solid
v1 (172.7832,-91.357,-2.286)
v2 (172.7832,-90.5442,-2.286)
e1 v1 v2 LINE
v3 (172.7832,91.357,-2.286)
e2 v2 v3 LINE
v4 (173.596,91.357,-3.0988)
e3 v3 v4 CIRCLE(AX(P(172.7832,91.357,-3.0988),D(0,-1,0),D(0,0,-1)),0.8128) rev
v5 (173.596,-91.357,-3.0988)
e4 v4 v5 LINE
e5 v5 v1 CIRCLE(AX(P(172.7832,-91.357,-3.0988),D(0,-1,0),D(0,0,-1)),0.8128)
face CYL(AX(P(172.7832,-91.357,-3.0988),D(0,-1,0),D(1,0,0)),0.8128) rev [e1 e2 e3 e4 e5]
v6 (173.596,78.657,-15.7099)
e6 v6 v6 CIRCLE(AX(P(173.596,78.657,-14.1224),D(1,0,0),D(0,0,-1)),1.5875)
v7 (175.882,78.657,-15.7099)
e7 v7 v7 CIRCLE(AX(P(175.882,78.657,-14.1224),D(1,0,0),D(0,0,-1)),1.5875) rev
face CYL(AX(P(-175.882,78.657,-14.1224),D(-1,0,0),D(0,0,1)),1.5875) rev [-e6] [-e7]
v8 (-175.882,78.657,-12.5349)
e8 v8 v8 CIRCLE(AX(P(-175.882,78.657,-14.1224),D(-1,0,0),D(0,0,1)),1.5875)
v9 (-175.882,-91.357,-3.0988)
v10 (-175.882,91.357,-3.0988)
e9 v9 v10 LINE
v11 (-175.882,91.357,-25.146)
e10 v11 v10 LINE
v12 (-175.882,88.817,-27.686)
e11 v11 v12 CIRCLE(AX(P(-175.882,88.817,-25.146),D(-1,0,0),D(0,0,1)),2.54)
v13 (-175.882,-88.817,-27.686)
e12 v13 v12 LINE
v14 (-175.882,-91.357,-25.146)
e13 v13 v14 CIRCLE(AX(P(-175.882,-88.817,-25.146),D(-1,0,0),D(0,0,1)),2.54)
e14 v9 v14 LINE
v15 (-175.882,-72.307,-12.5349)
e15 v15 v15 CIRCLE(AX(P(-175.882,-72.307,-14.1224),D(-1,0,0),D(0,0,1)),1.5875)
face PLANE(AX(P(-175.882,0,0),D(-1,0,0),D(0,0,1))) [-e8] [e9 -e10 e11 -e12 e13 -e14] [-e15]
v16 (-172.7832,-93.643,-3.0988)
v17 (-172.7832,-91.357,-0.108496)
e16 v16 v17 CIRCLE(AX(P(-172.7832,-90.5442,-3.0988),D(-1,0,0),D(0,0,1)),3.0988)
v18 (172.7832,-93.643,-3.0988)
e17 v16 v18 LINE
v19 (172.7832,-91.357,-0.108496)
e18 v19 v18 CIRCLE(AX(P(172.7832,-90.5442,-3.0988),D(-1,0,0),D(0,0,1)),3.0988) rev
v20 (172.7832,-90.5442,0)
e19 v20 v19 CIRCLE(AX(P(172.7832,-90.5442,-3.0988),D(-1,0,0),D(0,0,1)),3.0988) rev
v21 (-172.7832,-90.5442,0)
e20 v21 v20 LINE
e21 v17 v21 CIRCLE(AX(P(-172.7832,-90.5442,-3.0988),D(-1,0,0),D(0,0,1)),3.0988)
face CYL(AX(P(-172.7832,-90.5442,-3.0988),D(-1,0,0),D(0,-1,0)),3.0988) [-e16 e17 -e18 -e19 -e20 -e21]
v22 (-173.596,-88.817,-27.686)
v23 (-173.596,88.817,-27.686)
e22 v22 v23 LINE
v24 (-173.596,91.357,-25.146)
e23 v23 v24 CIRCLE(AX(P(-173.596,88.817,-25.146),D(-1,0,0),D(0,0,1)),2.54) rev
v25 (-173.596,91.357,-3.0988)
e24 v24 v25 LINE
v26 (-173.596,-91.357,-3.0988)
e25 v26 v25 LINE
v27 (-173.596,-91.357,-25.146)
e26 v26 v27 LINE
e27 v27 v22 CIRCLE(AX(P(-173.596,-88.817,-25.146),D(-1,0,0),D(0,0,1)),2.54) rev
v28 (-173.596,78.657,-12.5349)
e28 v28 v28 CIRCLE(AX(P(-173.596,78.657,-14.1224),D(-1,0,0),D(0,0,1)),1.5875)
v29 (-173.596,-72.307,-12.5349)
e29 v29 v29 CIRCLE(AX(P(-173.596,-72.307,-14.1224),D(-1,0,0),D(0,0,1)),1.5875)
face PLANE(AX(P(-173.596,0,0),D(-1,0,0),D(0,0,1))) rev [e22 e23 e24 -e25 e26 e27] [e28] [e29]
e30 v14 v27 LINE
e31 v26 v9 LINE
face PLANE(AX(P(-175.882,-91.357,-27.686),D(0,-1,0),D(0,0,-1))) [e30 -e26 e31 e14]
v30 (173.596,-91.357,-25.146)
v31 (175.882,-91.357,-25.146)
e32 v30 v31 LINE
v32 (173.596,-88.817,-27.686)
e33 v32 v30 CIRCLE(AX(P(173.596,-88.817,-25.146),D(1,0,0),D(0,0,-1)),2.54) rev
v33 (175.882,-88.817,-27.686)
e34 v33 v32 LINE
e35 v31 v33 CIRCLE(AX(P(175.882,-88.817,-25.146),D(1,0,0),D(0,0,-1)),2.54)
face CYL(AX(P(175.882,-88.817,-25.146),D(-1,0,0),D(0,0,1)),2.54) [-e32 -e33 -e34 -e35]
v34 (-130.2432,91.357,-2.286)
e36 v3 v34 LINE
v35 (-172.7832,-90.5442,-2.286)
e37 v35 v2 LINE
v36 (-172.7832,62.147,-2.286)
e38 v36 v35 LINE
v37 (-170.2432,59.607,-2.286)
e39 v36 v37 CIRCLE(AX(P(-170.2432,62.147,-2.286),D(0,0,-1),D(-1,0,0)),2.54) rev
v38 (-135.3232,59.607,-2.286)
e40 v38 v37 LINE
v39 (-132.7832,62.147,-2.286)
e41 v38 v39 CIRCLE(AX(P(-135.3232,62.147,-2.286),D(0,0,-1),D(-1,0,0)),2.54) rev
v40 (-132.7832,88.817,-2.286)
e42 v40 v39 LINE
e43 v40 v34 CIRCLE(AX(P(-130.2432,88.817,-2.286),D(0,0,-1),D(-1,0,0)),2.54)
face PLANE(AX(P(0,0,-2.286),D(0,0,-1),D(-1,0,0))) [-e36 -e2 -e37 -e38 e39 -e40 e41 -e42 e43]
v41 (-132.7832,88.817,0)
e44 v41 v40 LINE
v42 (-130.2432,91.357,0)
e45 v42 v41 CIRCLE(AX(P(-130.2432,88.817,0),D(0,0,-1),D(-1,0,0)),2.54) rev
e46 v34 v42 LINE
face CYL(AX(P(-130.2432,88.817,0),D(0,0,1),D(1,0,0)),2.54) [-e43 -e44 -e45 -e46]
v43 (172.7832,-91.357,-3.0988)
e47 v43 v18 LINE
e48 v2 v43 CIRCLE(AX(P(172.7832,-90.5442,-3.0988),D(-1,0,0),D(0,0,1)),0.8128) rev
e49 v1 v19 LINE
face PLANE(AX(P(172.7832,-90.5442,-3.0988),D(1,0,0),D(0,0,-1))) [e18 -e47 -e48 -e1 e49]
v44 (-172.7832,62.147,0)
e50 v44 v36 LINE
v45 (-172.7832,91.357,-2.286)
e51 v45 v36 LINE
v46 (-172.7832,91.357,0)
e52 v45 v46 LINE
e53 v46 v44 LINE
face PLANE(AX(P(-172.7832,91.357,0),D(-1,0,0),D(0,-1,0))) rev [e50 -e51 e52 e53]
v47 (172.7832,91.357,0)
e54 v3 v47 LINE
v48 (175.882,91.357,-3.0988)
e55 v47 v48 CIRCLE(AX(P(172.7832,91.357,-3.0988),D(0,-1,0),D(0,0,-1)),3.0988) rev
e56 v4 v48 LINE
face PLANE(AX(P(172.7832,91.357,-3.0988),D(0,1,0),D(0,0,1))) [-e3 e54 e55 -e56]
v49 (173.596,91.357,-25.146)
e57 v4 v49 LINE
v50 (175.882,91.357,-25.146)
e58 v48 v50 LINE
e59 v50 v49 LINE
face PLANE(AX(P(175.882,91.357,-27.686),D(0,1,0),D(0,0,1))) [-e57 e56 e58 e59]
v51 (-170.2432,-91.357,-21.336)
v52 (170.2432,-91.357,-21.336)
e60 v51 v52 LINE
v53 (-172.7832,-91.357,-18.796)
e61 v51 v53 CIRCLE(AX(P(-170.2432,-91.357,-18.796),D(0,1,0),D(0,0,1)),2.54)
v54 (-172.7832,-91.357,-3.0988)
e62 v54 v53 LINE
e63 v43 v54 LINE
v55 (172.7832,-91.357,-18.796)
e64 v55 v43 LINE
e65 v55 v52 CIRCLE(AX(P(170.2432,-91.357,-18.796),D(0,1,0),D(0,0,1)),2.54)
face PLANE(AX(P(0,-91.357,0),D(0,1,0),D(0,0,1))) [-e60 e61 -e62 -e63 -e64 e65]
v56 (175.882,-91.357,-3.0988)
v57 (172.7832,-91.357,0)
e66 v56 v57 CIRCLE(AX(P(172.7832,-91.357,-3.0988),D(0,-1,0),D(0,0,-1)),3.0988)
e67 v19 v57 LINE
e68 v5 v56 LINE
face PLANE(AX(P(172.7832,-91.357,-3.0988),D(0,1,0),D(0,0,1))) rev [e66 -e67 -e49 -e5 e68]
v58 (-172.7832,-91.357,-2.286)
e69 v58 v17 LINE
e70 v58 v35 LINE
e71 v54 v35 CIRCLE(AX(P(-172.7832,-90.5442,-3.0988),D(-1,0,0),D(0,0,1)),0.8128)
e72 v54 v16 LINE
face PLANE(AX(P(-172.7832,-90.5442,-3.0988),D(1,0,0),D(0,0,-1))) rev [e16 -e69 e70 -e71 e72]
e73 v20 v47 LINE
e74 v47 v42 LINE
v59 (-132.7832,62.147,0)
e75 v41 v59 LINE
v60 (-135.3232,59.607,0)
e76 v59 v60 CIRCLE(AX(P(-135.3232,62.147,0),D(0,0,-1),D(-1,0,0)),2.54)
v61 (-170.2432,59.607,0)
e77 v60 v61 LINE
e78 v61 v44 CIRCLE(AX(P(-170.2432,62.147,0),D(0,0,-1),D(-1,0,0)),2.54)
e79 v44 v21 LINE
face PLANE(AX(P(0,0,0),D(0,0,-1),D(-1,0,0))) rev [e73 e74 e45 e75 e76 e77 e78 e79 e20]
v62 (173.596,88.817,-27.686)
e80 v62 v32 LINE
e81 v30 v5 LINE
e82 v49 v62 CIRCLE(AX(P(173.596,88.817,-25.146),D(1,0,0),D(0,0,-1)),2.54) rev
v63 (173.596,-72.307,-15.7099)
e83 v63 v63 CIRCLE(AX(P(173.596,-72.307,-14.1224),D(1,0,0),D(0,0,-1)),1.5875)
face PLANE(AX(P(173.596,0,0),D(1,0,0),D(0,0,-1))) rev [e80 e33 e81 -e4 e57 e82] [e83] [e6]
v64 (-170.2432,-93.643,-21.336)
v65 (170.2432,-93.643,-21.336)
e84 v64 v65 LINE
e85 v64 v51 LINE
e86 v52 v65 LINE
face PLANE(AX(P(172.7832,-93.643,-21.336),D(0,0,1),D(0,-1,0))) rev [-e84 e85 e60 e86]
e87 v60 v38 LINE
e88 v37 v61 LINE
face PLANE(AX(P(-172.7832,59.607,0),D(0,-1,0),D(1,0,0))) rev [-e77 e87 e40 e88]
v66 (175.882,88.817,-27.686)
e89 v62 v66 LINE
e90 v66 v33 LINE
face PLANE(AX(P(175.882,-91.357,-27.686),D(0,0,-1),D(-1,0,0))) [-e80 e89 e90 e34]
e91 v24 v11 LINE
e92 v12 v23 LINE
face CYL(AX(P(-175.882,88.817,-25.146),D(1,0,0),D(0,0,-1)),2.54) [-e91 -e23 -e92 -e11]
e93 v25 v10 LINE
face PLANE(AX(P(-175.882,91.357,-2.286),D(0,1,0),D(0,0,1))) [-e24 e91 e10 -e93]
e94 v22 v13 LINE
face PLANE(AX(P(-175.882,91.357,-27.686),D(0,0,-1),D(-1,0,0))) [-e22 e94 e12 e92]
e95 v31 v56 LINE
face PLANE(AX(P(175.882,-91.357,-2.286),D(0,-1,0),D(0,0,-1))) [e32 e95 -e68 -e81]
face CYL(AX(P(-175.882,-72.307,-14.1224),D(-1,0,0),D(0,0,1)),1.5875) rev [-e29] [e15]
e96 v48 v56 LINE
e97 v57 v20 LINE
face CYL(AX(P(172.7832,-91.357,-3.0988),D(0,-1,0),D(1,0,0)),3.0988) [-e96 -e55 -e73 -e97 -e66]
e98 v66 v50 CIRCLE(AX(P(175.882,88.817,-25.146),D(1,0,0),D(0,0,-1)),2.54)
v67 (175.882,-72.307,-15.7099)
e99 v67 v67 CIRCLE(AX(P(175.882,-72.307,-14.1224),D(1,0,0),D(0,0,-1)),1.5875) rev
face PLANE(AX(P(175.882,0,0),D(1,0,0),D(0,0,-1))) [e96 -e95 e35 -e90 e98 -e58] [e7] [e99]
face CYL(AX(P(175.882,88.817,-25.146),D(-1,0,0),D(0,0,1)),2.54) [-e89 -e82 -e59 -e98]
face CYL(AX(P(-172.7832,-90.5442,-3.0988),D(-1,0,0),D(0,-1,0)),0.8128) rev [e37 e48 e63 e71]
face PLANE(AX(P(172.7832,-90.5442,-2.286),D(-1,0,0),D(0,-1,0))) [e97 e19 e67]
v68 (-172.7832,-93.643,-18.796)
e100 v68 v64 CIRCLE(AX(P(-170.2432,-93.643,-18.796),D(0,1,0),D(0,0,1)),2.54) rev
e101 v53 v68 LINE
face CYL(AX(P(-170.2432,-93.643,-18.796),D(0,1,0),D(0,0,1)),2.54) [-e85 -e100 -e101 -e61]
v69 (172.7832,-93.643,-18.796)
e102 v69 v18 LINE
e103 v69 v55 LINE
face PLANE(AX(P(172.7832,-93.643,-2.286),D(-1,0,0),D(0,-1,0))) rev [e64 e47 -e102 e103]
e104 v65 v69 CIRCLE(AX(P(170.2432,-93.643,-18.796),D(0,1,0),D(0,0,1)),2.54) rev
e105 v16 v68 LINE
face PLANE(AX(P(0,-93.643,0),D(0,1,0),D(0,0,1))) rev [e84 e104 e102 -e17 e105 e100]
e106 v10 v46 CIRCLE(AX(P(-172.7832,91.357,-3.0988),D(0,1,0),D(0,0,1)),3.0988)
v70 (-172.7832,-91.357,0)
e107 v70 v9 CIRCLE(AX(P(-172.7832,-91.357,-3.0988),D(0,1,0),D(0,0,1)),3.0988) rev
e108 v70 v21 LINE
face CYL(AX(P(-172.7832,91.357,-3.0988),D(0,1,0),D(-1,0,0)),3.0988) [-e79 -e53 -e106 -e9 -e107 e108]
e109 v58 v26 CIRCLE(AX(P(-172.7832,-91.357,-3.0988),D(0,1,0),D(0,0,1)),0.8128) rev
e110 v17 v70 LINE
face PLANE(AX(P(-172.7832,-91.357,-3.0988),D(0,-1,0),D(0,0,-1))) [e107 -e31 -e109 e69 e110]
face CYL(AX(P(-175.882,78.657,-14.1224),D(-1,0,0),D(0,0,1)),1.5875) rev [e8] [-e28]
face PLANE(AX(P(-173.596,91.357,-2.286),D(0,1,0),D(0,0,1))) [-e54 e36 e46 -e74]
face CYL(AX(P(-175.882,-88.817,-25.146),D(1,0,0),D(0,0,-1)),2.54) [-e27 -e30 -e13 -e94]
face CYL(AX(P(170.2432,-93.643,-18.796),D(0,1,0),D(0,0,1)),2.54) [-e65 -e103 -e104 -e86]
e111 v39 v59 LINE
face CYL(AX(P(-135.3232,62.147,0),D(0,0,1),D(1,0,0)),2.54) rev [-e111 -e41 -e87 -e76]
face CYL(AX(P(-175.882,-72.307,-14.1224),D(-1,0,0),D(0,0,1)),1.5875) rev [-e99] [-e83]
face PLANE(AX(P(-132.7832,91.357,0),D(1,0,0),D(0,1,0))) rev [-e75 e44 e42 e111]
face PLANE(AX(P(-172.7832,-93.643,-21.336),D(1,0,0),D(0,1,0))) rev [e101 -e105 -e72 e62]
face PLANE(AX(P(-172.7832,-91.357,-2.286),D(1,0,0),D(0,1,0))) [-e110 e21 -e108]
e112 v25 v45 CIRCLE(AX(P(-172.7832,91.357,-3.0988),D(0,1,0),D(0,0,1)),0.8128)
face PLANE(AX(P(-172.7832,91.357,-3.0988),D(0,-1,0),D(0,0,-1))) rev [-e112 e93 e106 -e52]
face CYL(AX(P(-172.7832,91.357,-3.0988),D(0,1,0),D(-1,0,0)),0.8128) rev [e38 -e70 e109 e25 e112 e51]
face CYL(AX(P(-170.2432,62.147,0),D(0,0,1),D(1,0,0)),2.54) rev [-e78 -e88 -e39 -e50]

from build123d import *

# Parameters (mm, degrees)
SKETCH1_W                      = 347.1920001
SKETCH1_H                      = 182.714000078
BASE_FLANGE1_DEPTH             = 2.286
EDGE_FLANGE1_STRIP_W           = 10.7696
EDGE_FLANGE1_STRIP_H           = 2.286
EDGE_FLANGE1_STRIP_CUT_DEPTH   = 182.714000078
EDGE_FLANGE1_STRIP_2_W         = 10.7696
EDGE_FLANGE1_STRIP_2_H         = 2.286
EDGE_FLANGE1_STRIP_CUT_2_DEPTH = 182.714000078
EDGE_FLANGE1_DEPTH             = 182.714000078
EDGE_FLANGE1_BEND_DEPTH        = 182.714000078
EDGE_FLANGE2_STRIP_W           = 10.7696
EDGE_FLANGE2_STRIP_H           = 2.286
EDGE_FLANGE2_STRIP_CUT_DEPTH   = 345.5664001
EDGE_FLANGE2_DEPTH             = 345.5664001
SKETCH17_W                     = 40
SKETCH17_H                     = 31.75
CUT_EXTRUDE1_DEPTH             = 201.869732409
FILLET1_R                      = 2.54
F_1_8_0_1250_DOWEL_HOLE1_D     = 3.175
F_1_8_0_1250_DOWEL_HOLE1_DEPTH = 351.7640001
F_1_8_0_1250_DOWEL_HOLE1_TIP   = 0.953866233


# Sheet-metal steps are written as plain solids
with BuildPart() as part:
    # Sketch1 → Base-Flange1 (new body)
    with BuildSketch(Plane.XY):
        Rectangle(SKETCH1_W, SKETCH1_H)
    extrude(amount=-BASE_FLANGE1_DEPTH)

    # Edge-Flange1 strip (across the edge) → Edge-Flange1 strip cut (cut)
    with BuildSketch(Plane(origin=(173.59600005, 91.357000039, -2.286), x_dir=(-1, 0, 0), z_dir=(0, -1, 0))):
        with Locations((-4.572, -1.143)):
            Rectangle(EDGE_FLANGE1_STRIP_W, EDGE_FLANGE1_STRIP_H)
    extrude(amount=EDGE_FLANGE1_STRIP_CUT_DEPTH, mode=Mode.SUBTRACT)

    # Edge-Flange1 strip 2 (across the edge) → Edge-Flange1 strip cut 2 (cut)
    with BuildSketch(Plane(origin=(-173.59600005, -91.357000039, -2.286), x_dir=(1, 0, 0), z_dir=(0, 1, 0))):
        with Locations((-4.572, -1.143)):
            Rectangle(EDGE_FLANGE1_STRIP_2_W, EDGE_FLANGE1_STRIP_2_H)
    extrude(amount=EDGE_FLANGE1_STRIP_CUT_2_DEPTH, mode=Mode.SUBTRACT)

    # Edge-Flange1 section (across the edge) → Edge-Flange1 (add)
    with BuildSketch(Plane(origin=(173.59600005, 91.357000039, -2.286), x_dir=(-1, 0, 0), z_dir=(0, -1, 0))):
        with BuildLine():
            Line((-2.286, 0.8128), (-2.286, 25.4))
            Line((-2.286, 25.4), (0, 25.4))
            Line((0, 25.4), (0, 0.8128))
            ThreePointArc((0, 0.8128), (0.238063608, 0.238063608), (0.8128, 0))
            Line((0.8128, 0), (0.8128, -2.286))
            ThreePointArc((0.8128, -2.286), (-1.378382494, -1.378382494), (-2.286, 0.8128))
        make_face()
    extrude(amount=EDGE_FLANGE1_DEPTH)

    # Edge-Flange1 section 2 (across the edge) → Edge-Flange1 bend (add)
    with BuildSketch(Plane(origin=(-173.59600005, -91.357000039, -2.286), x_dir=(1, 0, 0), z_dir=(0, 1, 0))):
        with BuildLine():
            Line((-2.286, 0.8128), (-2.286, 25.4))
            Line((-2.286, 25.4), (0, 25.4))
            Line((0, 25.4), (0, 0.8128))
            ThreePointArc((0, 0.8128), (0.238063608, 0.238063608), (0.8128, 0))
            Line((0.8128, 0), (0.8128, -2.286))
            ThreePointArc((0.8128, -2.286), (-1.378382494, -1.378382494), (-2.286, 0.8128))
        make_face()
    extrude(amount=EDGE_FLANGE1_BEND_DEPTH)

    # Edge-Flange2 strip (across the edge) → Edge-Flange2 strip cut (cut)
    with BuildSketch(Plane(origin=(172.78320005, -91.357000039, -2.286), x_dir=(0, 1, 0), z_dir=(-1, 0, 0))):
        with Locations((-4.572, -1.143)):
            Rectangle(EDGE_FLANGE2_STRIP_W, EDGE_FLANGE2_STRIP_H)
    extrude(amount=EDGE_FLANGE2_STRIP_CUT_DEPTH, mode=Mode.SUBTRACT)

    # Edge-Flange2 section (across the edge) → Edge-Flange2 (add)
    with BuildSketch(Plane(origin=(172.78320005, -91.357000039, -2.286), x_dir=(0, 1, 0), z_dir=(-1, 0, 0))):
        with BuildLine():
            Line((-2.286, 0.8128), (-2.286, 19.05))
            Line((-2.286, 19.05), (0, 19.05))
            Line((0, 19.05), (0, 0.8128))
            ThreePointArc((0, 0.8128), (0.238063608, 0.238063608), (0.8128, 0))
            Line((0.8128, 0), (0.8128, -2.286))
            ThreePointArc((0.8128, -2.286), (-1.378382494, -1.378382494), (-2.286, 0.8128))
        make_face()
    extrude(amount=EDGE_FLANGE2_DEPTH)

    # Sketch17 → Cut-Extrude1 (cut, through all)
    with BuildSketch(Plane(origin=(0, 0, -2.286), x_dir=(-1, 0, 0), z_dir=(0, 0, -1))):
        with Locations((152.78320005, 75.482000039)):
            Rectangle(SKETCH17_W, SKETCH17_H)
    extrude(amount=-CUT_EXTRUDE1_DEPTH, mode=Mode.SUBTRACT)

    # Fillet1
    fillet1_edges = [part.edges().sort_by_distance(p)[0] for p in [
        (172.78320005, -92.500000039, -21.336),
        (-172.78320005, -92.500000039, -21.336),
        (-172.78320005, 59.607000039, -1.143),
        (-132.78320005, 59.607000039, -1.143),
        (-132.78320005, 91.357000039, -1.143),
        (174.73900005, 91.357000039, -27.686),
        (174.73900005, -91.357000039, -27.686),
        (-174.73900005, -91.357000039, -27.686),
        (-174.73900005, 91.357000039, -27.686),
    ]]
    fillet(fillet1_edges, radius=FILLET1_R)

    # 1/8 (0.1250) Dowel Hole1
    with Locations(Plane.ZY.offset(175.88200005)):
        with Locations((-14.1224, -72.307000039), (-14.1224, 78.657000039)):
            Hole(F_1_8_0_1250_DOWEL_HOLE1_D / 2, depth=F_1_8_0_1250_DOWEL_HOLE1_DEPTH)
            with Locations((0, 0, -(F_1_8_0_1250_DOWEL_HOLE1_DEPTH + F_1_8_0_1250_DOWEL_HOLE1_TIP / 2))):  # 118° drill point
                Cone(0, F_1_8_0_1250_DOWEL_HOLE1_D / 2, F_1_8_0_1250_DOWEL_HOLE1_TIP, mode=Mode.SUBTRACT)


solid = part.part
